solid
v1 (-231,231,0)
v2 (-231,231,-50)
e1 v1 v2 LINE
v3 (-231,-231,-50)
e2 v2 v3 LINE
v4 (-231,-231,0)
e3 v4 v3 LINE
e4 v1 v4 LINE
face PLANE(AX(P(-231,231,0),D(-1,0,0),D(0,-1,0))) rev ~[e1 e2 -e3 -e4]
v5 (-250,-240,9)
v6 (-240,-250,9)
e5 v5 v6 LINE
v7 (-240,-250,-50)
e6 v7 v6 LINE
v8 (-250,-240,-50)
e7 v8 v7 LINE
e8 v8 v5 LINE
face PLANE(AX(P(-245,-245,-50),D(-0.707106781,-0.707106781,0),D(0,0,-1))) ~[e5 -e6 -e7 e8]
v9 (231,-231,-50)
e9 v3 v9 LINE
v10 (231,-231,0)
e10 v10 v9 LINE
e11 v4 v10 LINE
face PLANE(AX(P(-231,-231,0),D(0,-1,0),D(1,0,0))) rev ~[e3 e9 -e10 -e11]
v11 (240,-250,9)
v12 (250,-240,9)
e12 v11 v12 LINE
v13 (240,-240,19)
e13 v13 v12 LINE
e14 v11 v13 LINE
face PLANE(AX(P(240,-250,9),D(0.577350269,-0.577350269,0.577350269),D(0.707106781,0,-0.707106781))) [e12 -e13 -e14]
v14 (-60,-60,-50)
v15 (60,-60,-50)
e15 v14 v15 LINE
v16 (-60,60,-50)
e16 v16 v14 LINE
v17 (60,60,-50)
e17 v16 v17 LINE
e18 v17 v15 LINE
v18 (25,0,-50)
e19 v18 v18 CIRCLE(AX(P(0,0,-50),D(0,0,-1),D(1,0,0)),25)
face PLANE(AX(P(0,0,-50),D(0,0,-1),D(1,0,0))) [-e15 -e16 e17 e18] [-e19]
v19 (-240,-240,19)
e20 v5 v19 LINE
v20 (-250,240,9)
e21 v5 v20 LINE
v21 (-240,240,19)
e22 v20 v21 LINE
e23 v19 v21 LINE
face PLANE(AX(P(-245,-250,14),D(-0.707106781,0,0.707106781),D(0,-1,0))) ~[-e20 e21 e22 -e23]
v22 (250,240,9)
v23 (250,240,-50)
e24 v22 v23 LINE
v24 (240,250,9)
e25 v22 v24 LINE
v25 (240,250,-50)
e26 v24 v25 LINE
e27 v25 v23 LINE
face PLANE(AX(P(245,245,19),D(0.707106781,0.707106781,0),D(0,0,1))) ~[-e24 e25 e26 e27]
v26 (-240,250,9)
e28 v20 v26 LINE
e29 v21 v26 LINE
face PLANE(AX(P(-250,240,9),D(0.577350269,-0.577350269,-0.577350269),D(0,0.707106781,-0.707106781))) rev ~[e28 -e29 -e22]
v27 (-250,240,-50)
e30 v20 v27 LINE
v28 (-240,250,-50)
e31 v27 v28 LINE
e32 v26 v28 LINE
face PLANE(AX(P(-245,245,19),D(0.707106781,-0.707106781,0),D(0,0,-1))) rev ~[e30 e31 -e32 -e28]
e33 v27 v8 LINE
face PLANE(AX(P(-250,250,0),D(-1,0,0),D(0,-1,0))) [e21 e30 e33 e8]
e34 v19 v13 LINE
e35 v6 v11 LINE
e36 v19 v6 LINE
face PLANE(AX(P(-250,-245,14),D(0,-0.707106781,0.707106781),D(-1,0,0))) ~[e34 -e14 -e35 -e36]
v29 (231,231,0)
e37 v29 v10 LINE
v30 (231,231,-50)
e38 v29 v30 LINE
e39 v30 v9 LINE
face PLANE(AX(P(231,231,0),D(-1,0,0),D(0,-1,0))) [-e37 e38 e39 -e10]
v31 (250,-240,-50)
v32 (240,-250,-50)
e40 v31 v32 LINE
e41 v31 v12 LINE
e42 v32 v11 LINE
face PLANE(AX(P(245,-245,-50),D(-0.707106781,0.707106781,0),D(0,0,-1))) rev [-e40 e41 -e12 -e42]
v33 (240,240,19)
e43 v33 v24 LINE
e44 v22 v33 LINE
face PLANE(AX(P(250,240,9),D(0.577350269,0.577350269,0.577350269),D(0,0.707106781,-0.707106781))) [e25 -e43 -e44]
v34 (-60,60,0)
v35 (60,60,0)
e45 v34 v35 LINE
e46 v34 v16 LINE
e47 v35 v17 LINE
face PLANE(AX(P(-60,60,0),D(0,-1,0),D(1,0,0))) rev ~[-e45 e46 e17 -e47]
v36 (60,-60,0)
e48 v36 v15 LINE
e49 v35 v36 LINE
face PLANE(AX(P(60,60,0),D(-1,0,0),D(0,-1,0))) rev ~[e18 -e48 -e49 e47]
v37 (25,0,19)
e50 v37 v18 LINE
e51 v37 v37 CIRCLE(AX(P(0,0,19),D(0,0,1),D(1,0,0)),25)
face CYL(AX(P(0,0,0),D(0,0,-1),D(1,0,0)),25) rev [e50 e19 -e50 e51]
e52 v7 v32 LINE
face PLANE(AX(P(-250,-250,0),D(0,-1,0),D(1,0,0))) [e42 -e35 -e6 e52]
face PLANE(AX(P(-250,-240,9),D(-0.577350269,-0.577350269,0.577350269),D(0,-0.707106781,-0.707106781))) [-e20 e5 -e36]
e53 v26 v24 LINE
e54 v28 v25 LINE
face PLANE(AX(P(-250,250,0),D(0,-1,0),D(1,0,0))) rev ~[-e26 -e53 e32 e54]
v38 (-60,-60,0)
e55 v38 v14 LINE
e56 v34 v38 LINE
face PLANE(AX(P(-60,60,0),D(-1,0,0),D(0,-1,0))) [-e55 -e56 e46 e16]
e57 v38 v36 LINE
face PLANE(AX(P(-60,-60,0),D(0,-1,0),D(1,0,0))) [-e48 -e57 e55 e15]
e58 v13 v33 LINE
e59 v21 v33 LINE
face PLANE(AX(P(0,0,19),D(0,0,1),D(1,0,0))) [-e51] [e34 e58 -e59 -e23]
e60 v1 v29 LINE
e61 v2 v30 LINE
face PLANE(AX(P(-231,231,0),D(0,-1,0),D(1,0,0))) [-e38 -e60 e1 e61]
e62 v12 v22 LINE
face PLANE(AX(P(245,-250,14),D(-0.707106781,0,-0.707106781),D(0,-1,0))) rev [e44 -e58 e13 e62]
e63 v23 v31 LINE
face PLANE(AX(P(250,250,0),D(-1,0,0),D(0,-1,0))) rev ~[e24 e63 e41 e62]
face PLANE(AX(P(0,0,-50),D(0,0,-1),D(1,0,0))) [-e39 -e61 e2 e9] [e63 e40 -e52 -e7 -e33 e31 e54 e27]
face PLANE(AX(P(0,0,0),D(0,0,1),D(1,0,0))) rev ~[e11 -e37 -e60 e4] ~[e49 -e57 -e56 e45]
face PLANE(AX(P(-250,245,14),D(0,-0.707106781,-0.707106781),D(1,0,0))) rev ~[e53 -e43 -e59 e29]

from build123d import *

# Parameters (mm, degrees)
F0_W     = 500
F0_H     = 500
F0_R     = 25
F1_DEPTH = 19
F2_W     = 500
F2_H     = 500
F2_W_2   = 462
F2_H_2   = 462
F2_W_3   = 120
F2_H_3   = 120
F2_R     = 25
F3_DEPTH = 50
F4_SIZE  = 10


with BuildPart() as f1:
    # F0 (on Top) → F1 (new body)
    with BuildSketch(Plane.XY):
        Rectangle(F0_W, F0_H)
        Circle(F0_R, mode=Mode.SUBTRACT)
    extrude(amount=F1_DEPTH)

    # F2 (on face) → F3 (join)
    with BuildSketch(Plane(origin=(0, 0, 0), x_dir=(1, 0, 0), z_dir=(0, 0, -1))):
        Rectangle(F2_W, F2_H)
        Rectangle(F2_W_2, F2_H_2, mode=Mode.SUBTRACT)
        Rectangle(F2_W_3, F2_H_3)
        Circle(F2_R, mode=Mode.SUBTRACT)
    extrude(amount=F3_DEPTH)

    # F4
    f4_edges = [f1.edges().sort_by_distance(p)[0] for p in [
        (0, 250, 19),
        (250, 0, 19),
        (0, -250, 19),
        (-250, 0, 19),
        (-250, 250, -15.5),
        (-250, -250, -15.5),
        (250, 250, -15.5),
        (250, -250, -15.5),
    ]]
    chamfer(f4_edges, length=F4_SIZE)


solid = f1.part
